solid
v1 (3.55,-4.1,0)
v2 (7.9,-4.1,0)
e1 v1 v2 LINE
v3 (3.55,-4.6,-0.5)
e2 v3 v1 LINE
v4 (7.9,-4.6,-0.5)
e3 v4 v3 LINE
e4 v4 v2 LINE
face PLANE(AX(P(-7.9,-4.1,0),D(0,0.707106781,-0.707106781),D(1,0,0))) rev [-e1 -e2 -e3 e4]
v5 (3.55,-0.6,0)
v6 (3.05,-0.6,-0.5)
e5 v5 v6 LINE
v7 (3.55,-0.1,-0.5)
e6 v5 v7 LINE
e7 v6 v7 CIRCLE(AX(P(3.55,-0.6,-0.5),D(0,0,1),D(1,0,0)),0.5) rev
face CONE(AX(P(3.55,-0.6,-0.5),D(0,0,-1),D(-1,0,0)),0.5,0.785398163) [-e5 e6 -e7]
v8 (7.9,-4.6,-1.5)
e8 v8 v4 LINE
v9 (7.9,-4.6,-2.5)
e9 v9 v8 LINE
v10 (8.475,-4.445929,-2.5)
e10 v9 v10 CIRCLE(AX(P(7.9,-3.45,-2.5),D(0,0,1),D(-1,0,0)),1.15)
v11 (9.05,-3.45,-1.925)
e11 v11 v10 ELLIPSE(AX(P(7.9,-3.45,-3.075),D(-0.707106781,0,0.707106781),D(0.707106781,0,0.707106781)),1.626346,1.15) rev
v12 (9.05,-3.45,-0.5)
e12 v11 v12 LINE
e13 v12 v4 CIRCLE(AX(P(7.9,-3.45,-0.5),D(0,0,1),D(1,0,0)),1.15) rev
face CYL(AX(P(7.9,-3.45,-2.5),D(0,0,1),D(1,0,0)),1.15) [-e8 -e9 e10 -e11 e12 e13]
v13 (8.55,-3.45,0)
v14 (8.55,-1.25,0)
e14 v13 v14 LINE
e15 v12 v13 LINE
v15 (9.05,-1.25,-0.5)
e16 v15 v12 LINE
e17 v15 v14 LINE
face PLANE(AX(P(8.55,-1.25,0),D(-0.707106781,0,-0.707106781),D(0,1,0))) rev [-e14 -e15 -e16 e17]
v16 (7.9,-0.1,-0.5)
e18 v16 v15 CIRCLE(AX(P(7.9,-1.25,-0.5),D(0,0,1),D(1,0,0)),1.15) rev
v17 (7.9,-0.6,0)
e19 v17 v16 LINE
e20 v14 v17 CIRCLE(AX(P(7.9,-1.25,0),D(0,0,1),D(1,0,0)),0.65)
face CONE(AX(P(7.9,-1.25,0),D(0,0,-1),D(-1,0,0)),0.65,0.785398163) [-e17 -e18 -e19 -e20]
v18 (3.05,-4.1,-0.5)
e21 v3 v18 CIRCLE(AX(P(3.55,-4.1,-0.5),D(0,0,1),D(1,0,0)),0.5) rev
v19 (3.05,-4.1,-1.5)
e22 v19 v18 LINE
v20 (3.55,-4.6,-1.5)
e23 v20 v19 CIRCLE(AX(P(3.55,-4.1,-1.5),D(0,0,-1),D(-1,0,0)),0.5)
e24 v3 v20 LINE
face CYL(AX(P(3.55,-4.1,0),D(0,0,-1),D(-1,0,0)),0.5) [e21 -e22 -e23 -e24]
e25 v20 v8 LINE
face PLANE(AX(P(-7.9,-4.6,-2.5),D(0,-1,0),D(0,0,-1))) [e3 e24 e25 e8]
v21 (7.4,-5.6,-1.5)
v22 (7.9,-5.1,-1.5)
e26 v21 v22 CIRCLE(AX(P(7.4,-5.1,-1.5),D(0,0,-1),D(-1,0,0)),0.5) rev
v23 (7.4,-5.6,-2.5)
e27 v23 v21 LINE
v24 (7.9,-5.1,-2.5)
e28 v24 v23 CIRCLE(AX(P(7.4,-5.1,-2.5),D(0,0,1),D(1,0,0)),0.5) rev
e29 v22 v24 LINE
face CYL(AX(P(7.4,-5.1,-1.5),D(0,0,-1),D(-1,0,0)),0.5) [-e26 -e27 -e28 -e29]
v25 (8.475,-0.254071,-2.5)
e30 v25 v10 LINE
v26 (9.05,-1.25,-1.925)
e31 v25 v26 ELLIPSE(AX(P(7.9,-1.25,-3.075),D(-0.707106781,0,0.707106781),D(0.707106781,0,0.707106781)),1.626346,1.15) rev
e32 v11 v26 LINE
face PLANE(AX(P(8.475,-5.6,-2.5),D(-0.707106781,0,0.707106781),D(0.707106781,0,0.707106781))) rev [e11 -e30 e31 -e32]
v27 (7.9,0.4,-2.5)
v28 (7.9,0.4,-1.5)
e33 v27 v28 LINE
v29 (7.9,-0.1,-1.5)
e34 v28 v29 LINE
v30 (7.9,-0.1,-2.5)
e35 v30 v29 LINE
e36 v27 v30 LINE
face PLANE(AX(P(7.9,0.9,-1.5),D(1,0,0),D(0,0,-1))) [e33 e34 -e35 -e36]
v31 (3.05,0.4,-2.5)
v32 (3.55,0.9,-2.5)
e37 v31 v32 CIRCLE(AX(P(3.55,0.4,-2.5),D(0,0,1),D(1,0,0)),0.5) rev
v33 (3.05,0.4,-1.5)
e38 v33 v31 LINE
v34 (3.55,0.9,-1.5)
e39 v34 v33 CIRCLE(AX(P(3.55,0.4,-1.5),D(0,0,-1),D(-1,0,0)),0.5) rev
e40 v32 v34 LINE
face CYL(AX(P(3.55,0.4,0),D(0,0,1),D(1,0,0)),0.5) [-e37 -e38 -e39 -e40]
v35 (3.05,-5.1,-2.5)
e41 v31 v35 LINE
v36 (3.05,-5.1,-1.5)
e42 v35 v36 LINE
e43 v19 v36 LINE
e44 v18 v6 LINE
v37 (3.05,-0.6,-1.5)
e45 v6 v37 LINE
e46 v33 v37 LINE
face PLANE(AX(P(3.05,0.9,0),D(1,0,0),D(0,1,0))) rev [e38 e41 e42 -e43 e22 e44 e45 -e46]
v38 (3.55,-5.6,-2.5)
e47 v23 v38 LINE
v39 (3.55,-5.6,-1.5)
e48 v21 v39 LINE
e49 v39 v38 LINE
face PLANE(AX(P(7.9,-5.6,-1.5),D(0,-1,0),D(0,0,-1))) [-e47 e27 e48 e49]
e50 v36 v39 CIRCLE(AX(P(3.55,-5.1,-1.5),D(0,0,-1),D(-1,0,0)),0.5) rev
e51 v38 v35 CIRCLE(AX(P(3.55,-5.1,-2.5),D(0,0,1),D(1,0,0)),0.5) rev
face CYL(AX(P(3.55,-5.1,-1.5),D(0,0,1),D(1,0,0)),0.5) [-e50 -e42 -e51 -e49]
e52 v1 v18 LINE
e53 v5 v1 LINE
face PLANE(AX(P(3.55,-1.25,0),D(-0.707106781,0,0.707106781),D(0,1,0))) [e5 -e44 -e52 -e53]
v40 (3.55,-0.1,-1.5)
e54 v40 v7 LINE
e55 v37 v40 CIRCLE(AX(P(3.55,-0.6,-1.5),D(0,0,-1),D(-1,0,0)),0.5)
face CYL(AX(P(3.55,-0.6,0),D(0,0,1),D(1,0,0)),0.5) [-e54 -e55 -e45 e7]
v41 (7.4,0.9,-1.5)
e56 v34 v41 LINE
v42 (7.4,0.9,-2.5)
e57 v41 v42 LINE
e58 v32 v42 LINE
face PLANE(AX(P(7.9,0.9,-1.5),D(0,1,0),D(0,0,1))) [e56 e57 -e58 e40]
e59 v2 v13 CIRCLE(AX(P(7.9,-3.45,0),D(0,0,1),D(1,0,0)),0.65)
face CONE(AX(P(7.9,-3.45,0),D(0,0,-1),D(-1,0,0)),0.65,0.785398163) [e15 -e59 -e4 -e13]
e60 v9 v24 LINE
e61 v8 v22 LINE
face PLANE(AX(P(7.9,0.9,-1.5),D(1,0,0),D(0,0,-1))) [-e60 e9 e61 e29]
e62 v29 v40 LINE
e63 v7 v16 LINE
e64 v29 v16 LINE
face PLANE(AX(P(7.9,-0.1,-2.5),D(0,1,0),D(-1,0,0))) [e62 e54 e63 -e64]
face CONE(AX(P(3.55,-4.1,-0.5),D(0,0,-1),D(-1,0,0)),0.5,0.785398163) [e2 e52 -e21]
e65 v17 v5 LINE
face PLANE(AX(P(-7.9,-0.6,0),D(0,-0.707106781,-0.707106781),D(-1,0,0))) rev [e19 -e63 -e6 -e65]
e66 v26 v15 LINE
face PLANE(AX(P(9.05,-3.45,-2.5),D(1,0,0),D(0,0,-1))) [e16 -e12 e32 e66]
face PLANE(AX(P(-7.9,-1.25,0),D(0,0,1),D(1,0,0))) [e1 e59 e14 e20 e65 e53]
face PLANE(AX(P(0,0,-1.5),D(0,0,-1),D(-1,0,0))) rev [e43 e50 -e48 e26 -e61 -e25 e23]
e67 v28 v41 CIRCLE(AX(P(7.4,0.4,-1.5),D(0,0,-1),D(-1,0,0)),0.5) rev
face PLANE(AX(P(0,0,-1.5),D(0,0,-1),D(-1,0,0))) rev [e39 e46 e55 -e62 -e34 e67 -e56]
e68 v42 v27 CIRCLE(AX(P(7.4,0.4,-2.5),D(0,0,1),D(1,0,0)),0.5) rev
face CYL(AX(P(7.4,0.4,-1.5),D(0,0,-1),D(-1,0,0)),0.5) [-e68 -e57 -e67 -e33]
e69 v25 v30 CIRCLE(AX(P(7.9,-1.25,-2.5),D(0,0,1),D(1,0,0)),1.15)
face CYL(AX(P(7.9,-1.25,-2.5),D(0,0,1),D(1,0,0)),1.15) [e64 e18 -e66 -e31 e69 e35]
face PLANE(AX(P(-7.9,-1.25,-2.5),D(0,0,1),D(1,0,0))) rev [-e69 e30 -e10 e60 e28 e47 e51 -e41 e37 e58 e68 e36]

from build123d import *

# Parameters (mm, degrees)
EXTRUDE_1_DEPTH     = 2.5
SKETCH_2_W          = 15.8
SKETCH_2_H          = 6.5
EXTRUDE_2_DEPTH     = 1
FILLET_1_R          = 0.5
CUT_EXTRUDE_1_DEPTH = 12.419391402
SKETCH_4_W          = 12.1
SKETCH_4_H          = 6.5
CUT_EXTRUDE_2_DEPTH = 11.932177276
FILLET_2_R          = 0.5
CHAMFER_1_SIZE      = 0.5


with BuildPart() as part:
    # 草图1 → 凸台-拉伸1 (new body)
    with BuildSketch(Plane.XY):
        with BuildLine():
            Line((-9.05, -1.25), (-9.05, -3.45))
            ThreePointArc((-9.05, -3.45), (-8.713172798, -4.263172798), (-7.9, -4.6))
            Line((-7.9, -4.6), (7.9, -4.6))
            ThreePointArc((7.9, -4.6), (8.713172798, -4.263172798), (9.05, -3.45))
            Line((9.05, -3.45), (9.05, -1.25))
            ThreePointArc((9.05, -1.25), (8.713172798, -0.436827202), (7.9, -0.1))
            Line((7.9, -0.1), (-7.9, -0.1))
            ThreePointArc((-7.9, -0.1), (-8.713172798, -0.436827202), (-9.05, -1.25))
        make_face()
    extrude(amount=-EXTRUDE_1_DEPTH)

    # 草图2 → 凸台-拉伸2 (add)
    with BuildSketch(Plane(origin=(0, 0, -2.5), x_dir=(-1, 0, 0), z_dir=(0, 0, -1))):
        with Locations((0, -2.35)):
            Rectangle(SKETCH_2_W, SKETCH_2_H)
    extrude(amount=-EXTRUDE_2_DEPTH)

    # 圆角1
    fillet_1_edges = [part.edges().sort_by_distance(p)[0] for p in [
        (-7.9, 0.9, -2),
        (-7.9, -5.6, -2),
        (7.9, -5.6, -2),
        (7.9, 0.9, -2),
    ]]
    fillet(fillet_1_edges, radius=FILLET_1_R)

    # 草图3 → 切除-拉伸1 (cut, through all)
    with BuildSketch(Plane(origin=(0, 0.9, 0), x_dir=(1, 0, 0), z_dir=(0, 1, 0))):
        Polygon((8.475, 2.5), (9.05, 1.925), (9.05, 2.5), align=None)
        Polygon((-9.05, 1.925), (-9.05, 2.5), (-8.475, 2.5), align=None)
    extrude(amount=-CUT_EXTRUDE_1_DEPTH, mode=Mode.SUBTRACT)

    # 草图4 → 切除-拉伸2 (cut, through all)
    with BuildSketch(Plane(origin=(0, 0, -2.5), x_dir=(-1, 0, 0), z_dir=(0, 0, -1))):
        with Locations((3, -2.35)):
            Rectangle(SKETCH_4_W, SKETCH_4_H)
    extrude(amount=-CUT_EXTRUDE_2_DEPTH, mode=Mode.SUBTRACT)

    # 圆角2
    fillet_2_edges = [part.edges().sort_by_distance(p)[0] for p in [
        (3.05, -4.6, -0.75),
        (3.05, -0.1, -0.75),
        (3.05, 0.9, -2),
        (3.05, -5.6, -2),
    ]]
    fillet(fillet_2_edges, radius=FILLET_2_R)

    # 倒角1
    chamfer_1_edges = [part.edges().sort_by_distance(p)[0] for p in [
        (3.05, -2.35, 0),
        (5.725, -4.6, 0),
        (3.196446609, -0.246446609, 0),
        (3.196446609, -4.453553391, 0),
        (5.725, -0.1, 0),
        (8.713172798, -0.436827202, 0),
        (9.05, -2.35, 0),
        (8.713172798, -4.263172798, 0),
    ]]
    chamfer(chamfer_1_edges, length=CHAMFER_1_SIZE - 0.0001)  # a hair under: the kernel refuses the full size


solid = part.part
